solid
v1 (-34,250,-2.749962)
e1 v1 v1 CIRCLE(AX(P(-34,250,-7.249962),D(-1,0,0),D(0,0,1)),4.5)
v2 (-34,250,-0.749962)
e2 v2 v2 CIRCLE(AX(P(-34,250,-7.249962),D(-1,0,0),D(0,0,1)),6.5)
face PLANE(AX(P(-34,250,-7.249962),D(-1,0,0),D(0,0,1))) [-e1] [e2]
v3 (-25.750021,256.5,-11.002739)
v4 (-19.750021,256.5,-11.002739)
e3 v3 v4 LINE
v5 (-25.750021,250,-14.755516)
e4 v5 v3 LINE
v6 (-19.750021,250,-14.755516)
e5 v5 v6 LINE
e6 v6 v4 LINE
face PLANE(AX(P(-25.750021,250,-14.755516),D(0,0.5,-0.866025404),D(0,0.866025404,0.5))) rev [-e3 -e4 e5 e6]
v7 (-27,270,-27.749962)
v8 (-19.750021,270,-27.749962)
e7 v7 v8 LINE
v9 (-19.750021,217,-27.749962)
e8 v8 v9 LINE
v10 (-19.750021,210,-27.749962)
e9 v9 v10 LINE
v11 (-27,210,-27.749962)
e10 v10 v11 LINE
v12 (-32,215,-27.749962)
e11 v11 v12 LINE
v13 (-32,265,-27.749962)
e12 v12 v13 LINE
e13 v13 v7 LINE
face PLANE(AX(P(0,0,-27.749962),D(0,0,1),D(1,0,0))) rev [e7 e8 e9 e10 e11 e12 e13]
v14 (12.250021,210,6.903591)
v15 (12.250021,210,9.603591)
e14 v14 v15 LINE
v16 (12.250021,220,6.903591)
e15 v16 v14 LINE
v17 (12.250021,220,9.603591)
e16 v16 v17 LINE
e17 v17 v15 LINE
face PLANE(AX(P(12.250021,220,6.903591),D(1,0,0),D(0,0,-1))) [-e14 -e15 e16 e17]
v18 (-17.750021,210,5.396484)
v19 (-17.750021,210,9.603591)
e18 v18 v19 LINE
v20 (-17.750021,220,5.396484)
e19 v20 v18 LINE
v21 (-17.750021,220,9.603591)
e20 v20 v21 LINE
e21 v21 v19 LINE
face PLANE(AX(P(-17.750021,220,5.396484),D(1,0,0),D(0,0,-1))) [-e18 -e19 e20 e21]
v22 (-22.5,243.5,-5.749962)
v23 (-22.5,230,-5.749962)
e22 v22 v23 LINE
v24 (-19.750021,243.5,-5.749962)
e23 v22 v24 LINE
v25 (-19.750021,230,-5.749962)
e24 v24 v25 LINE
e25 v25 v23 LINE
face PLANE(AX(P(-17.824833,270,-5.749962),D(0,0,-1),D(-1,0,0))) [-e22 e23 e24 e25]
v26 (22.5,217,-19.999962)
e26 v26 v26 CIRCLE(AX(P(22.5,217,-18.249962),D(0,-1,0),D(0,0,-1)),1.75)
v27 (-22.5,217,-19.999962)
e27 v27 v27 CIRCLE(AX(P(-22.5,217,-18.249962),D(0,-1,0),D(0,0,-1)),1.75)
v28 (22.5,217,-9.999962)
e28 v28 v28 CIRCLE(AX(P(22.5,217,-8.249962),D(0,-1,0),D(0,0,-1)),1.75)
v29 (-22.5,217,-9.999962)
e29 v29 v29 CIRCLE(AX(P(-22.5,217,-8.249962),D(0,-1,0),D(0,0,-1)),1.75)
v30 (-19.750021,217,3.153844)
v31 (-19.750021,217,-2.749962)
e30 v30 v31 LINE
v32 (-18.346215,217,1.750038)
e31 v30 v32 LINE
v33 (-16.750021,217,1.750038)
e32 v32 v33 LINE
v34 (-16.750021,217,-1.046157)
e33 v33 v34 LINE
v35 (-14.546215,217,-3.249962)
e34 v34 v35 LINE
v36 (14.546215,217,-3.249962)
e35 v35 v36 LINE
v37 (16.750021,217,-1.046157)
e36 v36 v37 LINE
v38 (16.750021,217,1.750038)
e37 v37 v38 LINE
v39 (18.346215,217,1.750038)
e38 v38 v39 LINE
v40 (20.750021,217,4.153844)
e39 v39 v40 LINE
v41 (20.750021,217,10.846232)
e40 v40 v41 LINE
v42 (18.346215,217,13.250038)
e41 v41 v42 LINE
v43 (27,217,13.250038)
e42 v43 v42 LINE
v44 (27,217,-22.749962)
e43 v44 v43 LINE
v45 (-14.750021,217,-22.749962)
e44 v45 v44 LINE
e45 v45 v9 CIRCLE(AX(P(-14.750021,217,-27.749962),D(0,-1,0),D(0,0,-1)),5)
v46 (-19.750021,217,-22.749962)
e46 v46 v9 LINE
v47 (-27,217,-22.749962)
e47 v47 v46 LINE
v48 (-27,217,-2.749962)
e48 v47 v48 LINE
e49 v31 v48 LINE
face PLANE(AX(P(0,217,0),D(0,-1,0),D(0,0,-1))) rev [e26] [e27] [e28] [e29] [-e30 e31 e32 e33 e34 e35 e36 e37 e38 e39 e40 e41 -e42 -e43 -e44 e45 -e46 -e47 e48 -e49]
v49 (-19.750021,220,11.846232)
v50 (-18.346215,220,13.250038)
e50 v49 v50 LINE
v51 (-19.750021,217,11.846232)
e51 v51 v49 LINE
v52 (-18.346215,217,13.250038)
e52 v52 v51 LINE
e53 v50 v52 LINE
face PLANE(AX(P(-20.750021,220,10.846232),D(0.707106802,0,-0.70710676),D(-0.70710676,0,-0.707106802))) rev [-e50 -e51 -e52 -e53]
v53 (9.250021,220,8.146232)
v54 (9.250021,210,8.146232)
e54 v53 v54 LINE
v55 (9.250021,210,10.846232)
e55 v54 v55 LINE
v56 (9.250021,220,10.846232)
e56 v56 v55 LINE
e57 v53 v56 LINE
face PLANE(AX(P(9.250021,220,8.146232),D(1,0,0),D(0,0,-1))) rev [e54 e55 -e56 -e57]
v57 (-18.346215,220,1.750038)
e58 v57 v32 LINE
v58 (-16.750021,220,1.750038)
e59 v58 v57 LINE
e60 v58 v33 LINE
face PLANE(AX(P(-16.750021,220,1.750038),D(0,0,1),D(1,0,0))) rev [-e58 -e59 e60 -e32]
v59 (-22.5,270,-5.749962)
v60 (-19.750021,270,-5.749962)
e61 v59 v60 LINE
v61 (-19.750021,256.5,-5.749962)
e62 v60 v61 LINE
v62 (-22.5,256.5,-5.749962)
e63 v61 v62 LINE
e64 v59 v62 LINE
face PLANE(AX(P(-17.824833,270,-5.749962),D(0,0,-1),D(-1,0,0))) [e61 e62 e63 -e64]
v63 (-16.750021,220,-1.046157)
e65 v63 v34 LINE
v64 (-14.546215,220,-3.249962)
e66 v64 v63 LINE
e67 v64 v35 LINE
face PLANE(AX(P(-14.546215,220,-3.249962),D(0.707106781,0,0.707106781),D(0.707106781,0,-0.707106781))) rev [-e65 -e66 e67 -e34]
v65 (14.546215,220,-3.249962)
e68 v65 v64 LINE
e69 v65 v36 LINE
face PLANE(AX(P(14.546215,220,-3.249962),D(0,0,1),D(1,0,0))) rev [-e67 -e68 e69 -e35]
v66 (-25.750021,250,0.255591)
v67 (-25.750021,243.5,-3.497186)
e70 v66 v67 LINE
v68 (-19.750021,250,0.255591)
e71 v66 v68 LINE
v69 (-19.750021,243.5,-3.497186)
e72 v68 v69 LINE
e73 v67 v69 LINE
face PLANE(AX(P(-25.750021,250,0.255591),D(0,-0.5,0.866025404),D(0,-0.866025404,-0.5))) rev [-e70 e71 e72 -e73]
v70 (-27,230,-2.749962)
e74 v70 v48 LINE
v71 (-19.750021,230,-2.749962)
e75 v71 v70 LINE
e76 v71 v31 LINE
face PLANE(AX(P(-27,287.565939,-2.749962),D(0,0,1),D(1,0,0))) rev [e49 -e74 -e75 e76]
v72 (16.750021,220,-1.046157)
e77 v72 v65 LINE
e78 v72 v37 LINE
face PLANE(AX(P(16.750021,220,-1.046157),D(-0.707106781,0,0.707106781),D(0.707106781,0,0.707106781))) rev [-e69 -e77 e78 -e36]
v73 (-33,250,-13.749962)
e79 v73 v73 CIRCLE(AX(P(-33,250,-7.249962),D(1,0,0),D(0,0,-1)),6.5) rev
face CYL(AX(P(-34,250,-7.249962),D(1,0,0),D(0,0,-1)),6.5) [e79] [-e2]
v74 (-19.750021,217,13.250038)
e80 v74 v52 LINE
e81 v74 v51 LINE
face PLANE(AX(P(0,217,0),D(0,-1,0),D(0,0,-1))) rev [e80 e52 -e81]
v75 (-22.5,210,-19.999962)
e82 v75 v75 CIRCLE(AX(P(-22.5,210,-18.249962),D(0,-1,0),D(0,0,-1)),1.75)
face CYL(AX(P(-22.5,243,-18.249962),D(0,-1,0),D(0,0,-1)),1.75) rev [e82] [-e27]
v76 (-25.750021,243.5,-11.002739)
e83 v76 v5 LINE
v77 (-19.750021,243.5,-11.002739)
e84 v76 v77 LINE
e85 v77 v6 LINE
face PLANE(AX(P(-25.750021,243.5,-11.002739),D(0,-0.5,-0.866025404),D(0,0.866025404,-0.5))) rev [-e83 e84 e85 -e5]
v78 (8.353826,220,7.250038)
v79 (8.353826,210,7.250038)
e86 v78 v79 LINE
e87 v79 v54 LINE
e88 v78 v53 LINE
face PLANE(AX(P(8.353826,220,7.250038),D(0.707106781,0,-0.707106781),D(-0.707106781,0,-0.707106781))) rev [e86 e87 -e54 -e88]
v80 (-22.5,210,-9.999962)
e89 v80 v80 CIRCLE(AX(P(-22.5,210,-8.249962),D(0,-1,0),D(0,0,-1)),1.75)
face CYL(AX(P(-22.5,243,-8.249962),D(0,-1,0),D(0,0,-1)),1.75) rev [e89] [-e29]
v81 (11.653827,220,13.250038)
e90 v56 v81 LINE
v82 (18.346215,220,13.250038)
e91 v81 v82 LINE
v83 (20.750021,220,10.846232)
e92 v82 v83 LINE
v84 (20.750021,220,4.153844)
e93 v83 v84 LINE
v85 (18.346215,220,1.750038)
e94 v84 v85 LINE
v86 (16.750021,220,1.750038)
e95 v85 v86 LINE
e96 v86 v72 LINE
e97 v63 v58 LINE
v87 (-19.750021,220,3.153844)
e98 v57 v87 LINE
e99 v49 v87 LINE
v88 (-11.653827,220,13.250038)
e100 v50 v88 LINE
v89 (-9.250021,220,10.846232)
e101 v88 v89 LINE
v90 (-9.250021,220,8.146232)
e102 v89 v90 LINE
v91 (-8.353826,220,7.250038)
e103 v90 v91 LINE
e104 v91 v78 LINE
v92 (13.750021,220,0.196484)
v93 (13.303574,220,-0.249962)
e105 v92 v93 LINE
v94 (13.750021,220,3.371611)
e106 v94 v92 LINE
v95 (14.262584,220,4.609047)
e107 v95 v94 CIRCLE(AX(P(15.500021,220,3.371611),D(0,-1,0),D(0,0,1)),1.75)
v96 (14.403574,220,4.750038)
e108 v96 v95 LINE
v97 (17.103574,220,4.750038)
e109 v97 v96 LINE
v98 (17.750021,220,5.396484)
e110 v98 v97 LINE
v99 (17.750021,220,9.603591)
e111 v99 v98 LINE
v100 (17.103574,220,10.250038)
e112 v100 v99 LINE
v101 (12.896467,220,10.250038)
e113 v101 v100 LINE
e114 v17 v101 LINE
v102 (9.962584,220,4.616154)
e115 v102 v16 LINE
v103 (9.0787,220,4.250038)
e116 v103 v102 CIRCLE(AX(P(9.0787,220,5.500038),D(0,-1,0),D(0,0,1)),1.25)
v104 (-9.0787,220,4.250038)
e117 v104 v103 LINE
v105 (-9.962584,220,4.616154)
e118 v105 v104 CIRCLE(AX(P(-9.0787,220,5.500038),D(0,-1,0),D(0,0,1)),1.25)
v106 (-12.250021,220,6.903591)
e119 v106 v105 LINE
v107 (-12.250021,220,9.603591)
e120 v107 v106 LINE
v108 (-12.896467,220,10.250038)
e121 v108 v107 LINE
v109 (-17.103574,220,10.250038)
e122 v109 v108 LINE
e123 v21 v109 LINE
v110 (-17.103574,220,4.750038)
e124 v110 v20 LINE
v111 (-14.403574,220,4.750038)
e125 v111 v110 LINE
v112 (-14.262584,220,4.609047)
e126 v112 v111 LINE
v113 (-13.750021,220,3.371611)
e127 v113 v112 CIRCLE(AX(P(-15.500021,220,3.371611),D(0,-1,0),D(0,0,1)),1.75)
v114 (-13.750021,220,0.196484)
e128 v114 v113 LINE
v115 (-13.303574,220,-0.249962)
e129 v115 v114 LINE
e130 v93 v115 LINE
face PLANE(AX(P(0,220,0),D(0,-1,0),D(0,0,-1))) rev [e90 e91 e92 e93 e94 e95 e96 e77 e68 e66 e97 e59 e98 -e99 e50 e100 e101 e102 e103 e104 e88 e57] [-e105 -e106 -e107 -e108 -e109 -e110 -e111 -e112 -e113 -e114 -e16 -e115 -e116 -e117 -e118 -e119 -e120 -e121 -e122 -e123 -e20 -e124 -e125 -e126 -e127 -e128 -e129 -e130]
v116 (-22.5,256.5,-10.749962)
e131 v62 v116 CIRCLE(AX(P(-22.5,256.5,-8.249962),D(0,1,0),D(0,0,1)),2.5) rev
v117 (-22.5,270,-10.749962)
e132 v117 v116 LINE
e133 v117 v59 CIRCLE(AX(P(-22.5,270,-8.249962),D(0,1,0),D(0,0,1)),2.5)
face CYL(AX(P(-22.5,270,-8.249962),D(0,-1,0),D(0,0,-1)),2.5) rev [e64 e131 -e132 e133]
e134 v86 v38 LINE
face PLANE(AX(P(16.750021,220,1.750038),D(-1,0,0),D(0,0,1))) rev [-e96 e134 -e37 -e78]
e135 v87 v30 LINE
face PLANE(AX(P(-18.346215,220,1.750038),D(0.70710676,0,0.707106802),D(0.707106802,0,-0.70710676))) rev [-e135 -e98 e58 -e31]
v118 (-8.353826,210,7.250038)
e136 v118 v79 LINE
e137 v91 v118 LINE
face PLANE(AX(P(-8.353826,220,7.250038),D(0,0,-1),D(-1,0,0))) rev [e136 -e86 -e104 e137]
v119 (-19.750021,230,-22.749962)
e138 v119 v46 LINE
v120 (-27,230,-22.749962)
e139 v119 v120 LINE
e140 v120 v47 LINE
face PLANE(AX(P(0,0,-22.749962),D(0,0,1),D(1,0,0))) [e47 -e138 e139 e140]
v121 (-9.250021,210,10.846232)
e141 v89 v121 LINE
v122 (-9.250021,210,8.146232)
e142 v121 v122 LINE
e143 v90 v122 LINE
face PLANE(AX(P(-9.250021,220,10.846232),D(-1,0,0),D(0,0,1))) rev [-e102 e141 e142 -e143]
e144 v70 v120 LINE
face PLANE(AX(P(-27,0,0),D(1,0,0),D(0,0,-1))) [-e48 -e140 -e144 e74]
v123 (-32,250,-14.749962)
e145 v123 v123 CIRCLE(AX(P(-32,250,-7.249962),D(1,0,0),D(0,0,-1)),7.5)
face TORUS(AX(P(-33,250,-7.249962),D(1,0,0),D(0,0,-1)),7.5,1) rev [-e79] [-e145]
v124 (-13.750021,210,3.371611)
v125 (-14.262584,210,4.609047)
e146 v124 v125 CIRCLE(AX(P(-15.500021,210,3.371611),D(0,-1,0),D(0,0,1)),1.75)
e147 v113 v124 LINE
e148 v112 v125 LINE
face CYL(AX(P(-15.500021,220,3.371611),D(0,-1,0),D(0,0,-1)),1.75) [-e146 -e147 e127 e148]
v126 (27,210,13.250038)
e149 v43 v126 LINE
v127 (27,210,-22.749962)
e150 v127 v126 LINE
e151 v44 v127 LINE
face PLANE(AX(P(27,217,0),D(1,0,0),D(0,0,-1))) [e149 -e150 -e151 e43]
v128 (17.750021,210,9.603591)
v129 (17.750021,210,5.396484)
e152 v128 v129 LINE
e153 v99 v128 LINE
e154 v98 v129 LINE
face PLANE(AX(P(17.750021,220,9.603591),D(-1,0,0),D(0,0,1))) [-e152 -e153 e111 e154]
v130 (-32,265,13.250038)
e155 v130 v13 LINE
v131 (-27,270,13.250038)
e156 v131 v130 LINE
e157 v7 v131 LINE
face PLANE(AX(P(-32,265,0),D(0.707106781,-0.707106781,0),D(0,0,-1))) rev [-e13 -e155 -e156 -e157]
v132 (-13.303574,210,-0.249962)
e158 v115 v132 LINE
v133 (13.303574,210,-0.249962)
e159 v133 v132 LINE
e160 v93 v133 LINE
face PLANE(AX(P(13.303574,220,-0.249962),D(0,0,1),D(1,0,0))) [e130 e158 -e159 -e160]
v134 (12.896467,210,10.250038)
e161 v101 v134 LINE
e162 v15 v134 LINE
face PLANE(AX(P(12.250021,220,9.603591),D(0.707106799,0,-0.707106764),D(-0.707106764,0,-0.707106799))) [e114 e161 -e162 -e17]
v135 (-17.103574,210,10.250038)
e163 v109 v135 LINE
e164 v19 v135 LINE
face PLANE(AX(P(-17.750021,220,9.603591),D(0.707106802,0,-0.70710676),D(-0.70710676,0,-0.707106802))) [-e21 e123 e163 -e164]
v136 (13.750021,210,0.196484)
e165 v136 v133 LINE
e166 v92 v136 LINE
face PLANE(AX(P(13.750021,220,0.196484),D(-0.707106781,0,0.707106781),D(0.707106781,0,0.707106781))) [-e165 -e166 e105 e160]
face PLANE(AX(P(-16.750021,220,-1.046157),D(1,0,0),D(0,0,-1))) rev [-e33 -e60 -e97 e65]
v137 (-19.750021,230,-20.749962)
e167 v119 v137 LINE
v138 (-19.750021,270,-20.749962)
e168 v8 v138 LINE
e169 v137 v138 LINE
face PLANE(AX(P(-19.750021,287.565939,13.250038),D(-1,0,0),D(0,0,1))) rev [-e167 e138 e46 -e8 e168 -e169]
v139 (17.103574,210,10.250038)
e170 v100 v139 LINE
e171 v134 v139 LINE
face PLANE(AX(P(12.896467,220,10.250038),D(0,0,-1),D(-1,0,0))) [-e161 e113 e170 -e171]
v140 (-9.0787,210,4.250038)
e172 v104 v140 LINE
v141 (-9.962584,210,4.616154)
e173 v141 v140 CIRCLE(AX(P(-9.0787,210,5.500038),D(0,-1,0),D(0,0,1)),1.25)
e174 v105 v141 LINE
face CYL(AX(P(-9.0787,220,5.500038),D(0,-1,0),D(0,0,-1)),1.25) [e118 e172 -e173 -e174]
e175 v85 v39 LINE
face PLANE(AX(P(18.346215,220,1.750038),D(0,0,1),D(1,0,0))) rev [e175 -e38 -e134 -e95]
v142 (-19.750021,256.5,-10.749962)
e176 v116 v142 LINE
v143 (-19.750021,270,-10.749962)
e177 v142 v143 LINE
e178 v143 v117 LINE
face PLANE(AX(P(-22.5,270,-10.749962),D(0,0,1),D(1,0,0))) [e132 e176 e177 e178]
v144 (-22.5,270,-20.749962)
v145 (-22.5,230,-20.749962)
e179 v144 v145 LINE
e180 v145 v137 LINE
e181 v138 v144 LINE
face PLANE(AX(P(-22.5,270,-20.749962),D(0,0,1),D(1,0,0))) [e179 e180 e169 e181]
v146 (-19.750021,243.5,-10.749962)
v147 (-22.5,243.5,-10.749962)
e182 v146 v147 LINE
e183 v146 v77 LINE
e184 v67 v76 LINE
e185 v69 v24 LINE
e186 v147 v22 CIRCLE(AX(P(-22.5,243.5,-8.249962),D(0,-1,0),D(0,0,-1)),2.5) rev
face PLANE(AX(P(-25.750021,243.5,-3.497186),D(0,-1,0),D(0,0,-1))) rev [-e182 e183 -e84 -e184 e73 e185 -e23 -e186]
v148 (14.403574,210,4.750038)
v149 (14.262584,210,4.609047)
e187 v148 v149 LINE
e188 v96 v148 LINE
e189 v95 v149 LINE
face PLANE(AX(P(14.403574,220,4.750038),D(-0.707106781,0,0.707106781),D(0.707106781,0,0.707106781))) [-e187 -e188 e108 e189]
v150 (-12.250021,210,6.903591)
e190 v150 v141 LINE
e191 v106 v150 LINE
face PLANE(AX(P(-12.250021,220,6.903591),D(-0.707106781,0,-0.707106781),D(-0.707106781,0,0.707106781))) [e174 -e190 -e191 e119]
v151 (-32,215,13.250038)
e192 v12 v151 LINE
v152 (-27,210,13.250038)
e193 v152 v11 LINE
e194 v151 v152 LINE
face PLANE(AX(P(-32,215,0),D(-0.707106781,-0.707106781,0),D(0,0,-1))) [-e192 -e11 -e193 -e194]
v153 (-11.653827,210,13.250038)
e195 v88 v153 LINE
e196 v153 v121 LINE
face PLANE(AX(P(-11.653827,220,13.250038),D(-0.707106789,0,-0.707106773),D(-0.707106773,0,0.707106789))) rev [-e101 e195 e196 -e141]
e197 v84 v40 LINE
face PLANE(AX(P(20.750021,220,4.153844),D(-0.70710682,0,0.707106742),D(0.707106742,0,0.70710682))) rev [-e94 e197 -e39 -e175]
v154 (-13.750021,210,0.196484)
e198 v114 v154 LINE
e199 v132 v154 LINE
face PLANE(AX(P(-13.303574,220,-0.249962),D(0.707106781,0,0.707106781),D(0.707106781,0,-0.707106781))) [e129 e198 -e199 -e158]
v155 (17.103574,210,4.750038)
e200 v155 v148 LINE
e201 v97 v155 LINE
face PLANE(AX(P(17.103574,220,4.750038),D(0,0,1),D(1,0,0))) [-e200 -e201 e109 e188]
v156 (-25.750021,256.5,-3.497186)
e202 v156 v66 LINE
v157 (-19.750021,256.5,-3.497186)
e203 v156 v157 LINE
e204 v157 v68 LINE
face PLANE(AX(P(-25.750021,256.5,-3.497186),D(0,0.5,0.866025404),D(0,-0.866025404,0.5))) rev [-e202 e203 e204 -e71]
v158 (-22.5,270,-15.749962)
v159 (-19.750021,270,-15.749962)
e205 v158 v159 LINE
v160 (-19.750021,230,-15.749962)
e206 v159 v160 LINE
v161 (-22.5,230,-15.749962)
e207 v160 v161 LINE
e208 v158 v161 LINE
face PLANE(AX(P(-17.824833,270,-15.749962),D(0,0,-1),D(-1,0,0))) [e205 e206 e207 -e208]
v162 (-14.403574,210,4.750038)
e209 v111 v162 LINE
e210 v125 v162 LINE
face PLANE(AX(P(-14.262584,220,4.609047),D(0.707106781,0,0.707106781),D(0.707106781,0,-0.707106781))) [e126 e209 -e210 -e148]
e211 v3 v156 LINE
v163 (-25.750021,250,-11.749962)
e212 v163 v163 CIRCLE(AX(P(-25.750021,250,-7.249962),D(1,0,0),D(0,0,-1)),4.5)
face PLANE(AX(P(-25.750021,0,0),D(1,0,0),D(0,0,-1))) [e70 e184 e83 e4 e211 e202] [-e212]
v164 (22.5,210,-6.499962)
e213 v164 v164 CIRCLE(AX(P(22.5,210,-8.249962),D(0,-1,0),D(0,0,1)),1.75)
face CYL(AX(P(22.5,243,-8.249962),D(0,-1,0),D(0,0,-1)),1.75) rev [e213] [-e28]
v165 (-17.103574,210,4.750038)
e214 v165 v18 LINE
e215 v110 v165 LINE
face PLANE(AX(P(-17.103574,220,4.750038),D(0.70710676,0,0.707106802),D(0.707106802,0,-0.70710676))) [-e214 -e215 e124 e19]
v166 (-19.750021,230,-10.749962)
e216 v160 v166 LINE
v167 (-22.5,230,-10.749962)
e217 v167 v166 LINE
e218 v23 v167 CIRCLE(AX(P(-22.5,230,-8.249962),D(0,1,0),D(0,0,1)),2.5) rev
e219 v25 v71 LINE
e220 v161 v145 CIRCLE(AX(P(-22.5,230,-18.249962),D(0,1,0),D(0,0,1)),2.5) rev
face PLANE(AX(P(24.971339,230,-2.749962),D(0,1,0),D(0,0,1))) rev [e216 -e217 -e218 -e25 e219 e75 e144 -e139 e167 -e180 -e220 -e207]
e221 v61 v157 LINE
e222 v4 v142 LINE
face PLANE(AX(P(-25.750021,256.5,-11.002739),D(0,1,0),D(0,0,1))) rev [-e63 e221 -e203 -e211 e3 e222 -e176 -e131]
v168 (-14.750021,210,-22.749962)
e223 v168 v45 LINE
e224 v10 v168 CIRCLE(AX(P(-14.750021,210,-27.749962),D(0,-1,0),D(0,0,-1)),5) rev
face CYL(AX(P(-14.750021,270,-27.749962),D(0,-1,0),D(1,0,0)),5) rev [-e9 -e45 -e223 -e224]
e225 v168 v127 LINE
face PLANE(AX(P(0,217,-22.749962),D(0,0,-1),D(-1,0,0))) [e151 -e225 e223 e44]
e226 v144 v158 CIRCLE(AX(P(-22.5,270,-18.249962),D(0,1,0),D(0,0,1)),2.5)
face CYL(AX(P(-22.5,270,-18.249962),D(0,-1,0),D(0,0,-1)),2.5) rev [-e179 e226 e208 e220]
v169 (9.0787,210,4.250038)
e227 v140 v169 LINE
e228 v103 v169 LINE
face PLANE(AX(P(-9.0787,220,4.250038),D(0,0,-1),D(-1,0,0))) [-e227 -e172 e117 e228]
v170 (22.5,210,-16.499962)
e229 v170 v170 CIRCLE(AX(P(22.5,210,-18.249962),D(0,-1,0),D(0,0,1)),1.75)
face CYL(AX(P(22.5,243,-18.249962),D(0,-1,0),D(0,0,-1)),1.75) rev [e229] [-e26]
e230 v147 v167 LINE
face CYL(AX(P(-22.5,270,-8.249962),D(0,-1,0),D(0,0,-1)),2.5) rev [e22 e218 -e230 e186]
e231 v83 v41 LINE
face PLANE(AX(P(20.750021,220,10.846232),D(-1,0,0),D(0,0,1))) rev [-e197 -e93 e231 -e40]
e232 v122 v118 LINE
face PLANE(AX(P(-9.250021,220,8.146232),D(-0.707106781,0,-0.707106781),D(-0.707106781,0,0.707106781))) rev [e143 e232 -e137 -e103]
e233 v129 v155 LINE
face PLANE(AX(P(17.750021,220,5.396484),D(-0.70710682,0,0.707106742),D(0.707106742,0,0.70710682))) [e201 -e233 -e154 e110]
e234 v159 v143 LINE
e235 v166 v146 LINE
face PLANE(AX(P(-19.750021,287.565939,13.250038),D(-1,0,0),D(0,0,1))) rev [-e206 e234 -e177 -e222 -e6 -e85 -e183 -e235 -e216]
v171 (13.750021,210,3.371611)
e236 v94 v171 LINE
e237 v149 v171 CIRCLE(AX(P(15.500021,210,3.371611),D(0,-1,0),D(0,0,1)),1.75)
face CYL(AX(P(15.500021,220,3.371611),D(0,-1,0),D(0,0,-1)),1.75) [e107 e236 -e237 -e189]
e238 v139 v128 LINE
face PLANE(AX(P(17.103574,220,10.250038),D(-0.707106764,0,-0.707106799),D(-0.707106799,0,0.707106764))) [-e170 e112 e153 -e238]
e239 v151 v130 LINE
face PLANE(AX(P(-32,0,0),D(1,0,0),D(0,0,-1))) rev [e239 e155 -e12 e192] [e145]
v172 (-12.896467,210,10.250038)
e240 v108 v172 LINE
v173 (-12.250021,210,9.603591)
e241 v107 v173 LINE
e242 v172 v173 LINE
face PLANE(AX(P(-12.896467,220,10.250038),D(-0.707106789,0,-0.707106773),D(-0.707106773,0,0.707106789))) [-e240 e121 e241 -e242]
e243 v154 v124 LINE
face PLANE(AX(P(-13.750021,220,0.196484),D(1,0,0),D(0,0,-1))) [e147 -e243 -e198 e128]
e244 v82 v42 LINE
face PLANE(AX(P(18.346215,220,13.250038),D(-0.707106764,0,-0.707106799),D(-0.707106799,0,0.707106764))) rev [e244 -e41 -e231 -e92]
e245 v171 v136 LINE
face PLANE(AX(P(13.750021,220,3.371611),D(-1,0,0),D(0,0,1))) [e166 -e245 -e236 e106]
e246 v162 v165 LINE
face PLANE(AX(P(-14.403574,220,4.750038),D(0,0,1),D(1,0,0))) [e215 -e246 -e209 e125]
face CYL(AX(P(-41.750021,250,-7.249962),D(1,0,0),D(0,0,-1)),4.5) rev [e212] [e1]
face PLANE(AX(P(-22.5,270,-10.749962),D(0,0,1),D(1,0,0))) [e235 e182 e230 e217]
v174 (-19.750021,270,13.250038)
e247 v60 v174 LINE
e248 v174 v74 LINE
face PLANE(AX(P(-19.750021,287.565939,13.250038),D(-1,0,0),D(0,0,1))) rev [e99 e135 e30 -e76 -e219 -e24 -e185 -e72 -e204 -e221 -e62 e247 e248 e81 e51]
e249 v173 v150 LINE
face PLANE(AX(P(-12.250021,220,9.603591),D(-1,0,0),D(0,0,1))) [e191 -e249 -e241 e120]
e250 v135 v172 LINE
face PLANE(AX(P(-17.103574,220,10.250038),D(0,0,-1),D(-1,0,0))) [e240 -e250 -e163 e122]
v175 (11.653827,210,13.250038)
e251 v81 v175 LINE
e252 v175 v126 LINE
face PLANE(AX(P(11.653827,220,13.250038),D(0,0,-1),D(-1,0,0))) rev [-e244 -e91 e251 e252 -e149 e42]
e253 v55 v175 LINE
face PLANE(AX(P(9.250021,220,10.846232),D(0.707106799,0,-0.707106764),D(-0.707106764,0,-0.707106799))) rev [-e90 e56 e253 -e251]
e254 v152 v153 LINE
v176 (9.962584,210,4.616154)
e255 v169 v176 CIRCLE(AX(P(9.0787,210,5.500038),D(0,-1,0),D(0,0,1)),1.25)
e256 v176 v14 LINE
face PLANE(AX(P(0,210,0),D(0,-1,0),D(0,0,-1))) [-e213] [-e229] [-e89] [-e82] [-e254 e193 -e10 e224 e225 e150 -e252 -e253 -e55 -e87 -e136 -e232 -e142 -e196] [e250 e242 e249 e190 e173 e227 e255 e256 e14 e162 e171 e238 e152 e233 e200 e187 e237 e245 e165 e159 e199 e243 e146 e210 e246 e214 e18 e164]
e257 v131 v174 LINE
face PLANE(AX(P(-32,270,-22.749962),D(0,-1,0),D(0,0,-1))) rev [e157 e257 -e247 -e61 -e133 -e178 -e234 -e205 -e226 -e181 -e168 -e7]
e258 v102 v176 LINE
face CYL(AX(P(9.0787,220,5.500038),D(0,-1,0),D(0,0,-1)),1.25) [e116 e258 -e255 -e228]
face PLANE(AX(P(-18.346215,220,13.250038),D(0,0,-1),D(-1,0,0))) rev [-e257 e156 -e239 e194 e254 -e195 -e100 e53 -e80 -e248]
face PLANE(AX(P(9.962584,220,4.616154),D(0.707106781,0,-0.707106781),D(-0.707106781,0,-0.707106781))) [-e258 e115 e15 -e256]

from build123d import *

# Parameters (mm, degrees)
BOSS_EXTRUDE1_DEPTH = 400
BOSS_EXTRUDE2_DEPTH = 10
SKETCH3_R           = 43.000999871
CUT_EXTRUDE1_DEPTH  = 447.360216168
BOSS_EXTRUDE3_DEPTH = 7
SKETCH5_R           = 1.75
CUT_EXTRUDE2_DEPTH  = 33
SKETCH6_W           = 36.000000185
SKETCH6_H           = 60
BOSS_EXTRUDE4_DEPTH = 5
SKETCH7_W           = 7.24997928
SKETCH7_H           = 16
BOSS_EXTRUDE5_DEPTH = 53
SKETCH8_W           = 12.24997928
SKETCH8_H           = 60
BOSS_EXTRUDE6_DEPTH = 5
FILLET1_R           = 5
SKETCH10_W          = 20.000000185
SKETCH10_H          = 40
BOSS_EXTRUDE7_DEPTH = 7.24997928
CUT_EXTRUDE3_DEPTH  = 6
CUT_EXTRUDE4_DEPTH  = 68.845857758
SKETCH12_R          = 4.5
CUT_EXTRUDE5_DEPTH  = 16
CHAMFER2_SIZE       = 5
CHAMFER3_SIZE       = 5
SKETCH13_R          = 6.5
SKETCH13_R_2        = 4.5
BOSS_EXTRUDE8_DEPTH = 2
FILLET2_R           = 1


with BuildPart() as part:
    # Sketch1 → Boss-Extrude1 (new body)
    with BuildSketch(Plane(origin=(0, 200, 0), x_dir=(1, 0, 0), z_dir=(0, 1, 0))):
        with BuildLine():
            Line((1e-09, -3.855700002), (0.25, -4.00003757))
            Line((0.25, -4.00003757), (9.078700232, -4.00003757))
            ThreePointArc((9.078700232, -4.00003757), (9.652725366, -4.114218268), (10.139360377, -4.439377387))
            Line((10.139360377, -4.439377387), (12.500020747, -6.800037757))
            Line((12.500020747, -6.800037757), (12.500020747, -9.500037757))
            Line((12.500020747, -9.500037757), (13.00002072, -10.000037755))
            Line((13.00002072, -10.000037755), (17.00002072, -10.000037755))
            Line((17.00002072, -10.000037755), (17.500020747, -9.500037752))
            Line((17.500020747, -9.500037752), (17.500020747, -5.500037752))
            Line((17.500020747, -5.500037752), (17.00002075, -5.0000377))
            Line((17.00002075, -5.0000377), (14.30002072, -5.0000377))
            Line((14.30002072, -5.0000377), (14.085807141, -4.785824121))
            ThreePointArc((14.085807141, -4.785824121), (13.652261651, -4.136977442), (13.50002072, -3.371610598))
            Line((13.50002072, -3.371610598), (13.50002072, -0.30003757))
            Line((13.50002072, -0.30003757), (13.20002072, -3.757e-05))
            Line((13.20002072, -3.757e-05), (7.50002072, -3.757e-05))
            Line((7.50002072, -3.757e-05), (7.40002072, -0.10003757))
            Line((7.40002072, -0.10003757), (-7.40002072, -0.10003757))
            Line((-7.40002072, -0.10003757), (-7.50002072, -3.757e-05))
            Line((-7.50002072, -3.757e-05), (-13.20002072, -3.757e-05))
            Line((-13.20002072, -3.757e-05), (-13.50002072, -0.30003757))
            Line((-13.50002072, -0.30003757), (-13.50002072, -3.371610628))
            ThreePointArc((-13.50002072, -3.371610628), (-13.652261651, -4.136977472), (-14.085807141, -4.785824151))
            Line((-14.085807141, -4.785824151), (-14.30002069, -5.0000377))
            Line((-14.30002069, -5.0000377), (-17.00002072, -5.0000377))
            Line((-17.00002072, -5.0000377), (-17.50002072, -5.50003767))
            Line((-17.50002072, -5.50003767), (-17.50002072, -9.50003767))
            Line((-17.50002072, -9.50003767), (-17.000020665, -10.000037755))
            Line((-17.000020665, -10.000037755), (-13.00002072, -10.000037755))
            Line((-13.00002072, -10.000037755), (-12.500020741, -9.500037764))
            Line((-12.500020741, -9.500037764), (-12.500020741, -6.800037764))
            Line((-12.500020741, -6.800037764), (-10.139360364, -4.439377387))
            ThreePointArc((-10.139360364, -4.439377387), (-9.652725352, -4.114218268), (-9.078700218, -4.00003757))
            Line((-9.078700218, -4.00003757), (-0.25, -4.00003757))
            Line((-0.25, -4.00003757), (1e-09, -3.855700002))
        make_face()
    extrude(amount=-BOSS_EXTRUDE1_DEPTH)

    # Sketch3 → Cut-Extrude1 (cut)
    with BuildSketch(Plane(origin=(0, 200, 0), x_dir=(1, 0, 0), z_dir=(0, 1, 0))):
        with Locations((0, -0.10003757)):
            Circle(SKETCH3_R)
    extrude(amount=-CUT_EXTRUDE1_DEPTH, mode=Mode.SUBTRACT)


with BuildPart() as body_2:
    # Sketch2 → Boss-Extrude2 (new body)
    with BuildSketch(Plane(origin=(0, 210, 0), x_dir=(1, 0, 0), z_dir=(0, 1, 0))):
        Polygon((-8.353826469, -7.25003757), (8.353826482, -7.25003757), (9.250020747, -8.146231835), (9.250020747, -10.846231788), (11.653826595, -13.250037755), (18.34621475, -13.250037755), (20.750020747, -10.846231878), (20.750020747, -4.153843779), (18.346214932, -1.7500377), (16.75002072, -1.7500377), (16.75002072, 1.046156508), (14.546214798, 3.24996243), (-14.546214798, 3.24996243), (-16.75002072, 1.046156508), (-16.75002072, -1.7500377), (-18.346214741, -1.7500377), (-20.75002072, -4.153843535), (-20.75002072, -10.846231691), (-18.3462148, -13.250037755), (-11.653826621, -13.250037755), (-9.250020741, -10.846231821), (-9.250020741, -8.146231842), align=None)
        with BuildLine():
            Line((13.303574111, 0.24996243), (-13.303574111, 0.24996243))
            Line((-13.303574111, 0.24996243), (-13.75002072, -0.196484179))
            Line((-13.75002072, -0.196484179), (-13.75002072, -3.371610628))
            ThreePointArc((-13.75002072, -3.371610628), (-13.883231534, -4.041306614), (-14.262583837, -4.609047456))
            Line((-14.262583837, -4.609047456), (-14.403574081, -4.7500377))
            Line((-14.403574081, -4.7500377), (-17.103574106, -4.7500377))
            Line((-17.103574106, -4.7500377), (-17.75002072, -5.396484275))
            Line((-17.75002072, -5.396484275), (-17.75002072, -9.603591056))
            Line((-17.75002072, -9.603591056), (-17.10357406, -10.250037755))
            Line((-17.10357406, -10.250037755), (-12.896467328, -10.250037755))
            Line((-12.896467328, -10.250037755), (-12.250020741, -9.603591153))
            Line((-12.250020741, -9.603591153), (-12.250020741, -6.903591155))
            Line((-12.250020741, -6.903591155), (-9.962583668, -4.616154083))
            ThreePointArc((-9.962583668, -4.616154083), (-9.557054494, -4.345188152), (-9.078700218, -4.25003757))
            Line((-9.078700218, -4.25003757), (9.078700232, -4.25003757))
            ThreePointArc((9.078700232, -4.25003757), (9.557054508, -4.345188152), (9.962583682, -4.616154083))
            Line((9.962583682, -4.616154083), (12.250020747, -6.903591148))
            Line((12.250020747, -6.903591148), (12.250020747, -9.603591144))
            Line((12.250020747, -9.603591144), (12.896467326, -10.250037755))
            Line((12.896467326, -10.250037755), (17.103574107, -10.250037755))
            Line((17.103574107, -10.250037755), (17.750020747, -9.603591147))
            Line((17.750020747, -9.603591147), (17.750020747, -5.39648437))
            Line((17.750020747, -5.39648437), (17.103574149, -4.7500377))
            Line((17.103574149, -4.7500377), (14.403574111, -4.7500377))
            Line((14.403574111, -4.7500377), (14.262583837, -4.609047426))
            ThreePointArc((14.262583837, -4.609047426), (13.883231534, -4.041306584), (13.75002072, -3.371610598))
            Line((13.75002072, -3.371610598), (13.75002072, -0.196484179))
            Line((13.75002072, -0.196484179), (13.303574111, 0.24996243))
        make_face(mode=Mode.SUBTRACT)
    extrude(amount=BOSS_EXTRUDE2_DEPTH)

    # Sketch4 → Boss-Extrude3 (add)
    with BuildSketch(Plane(origin=(0, 210, 0), x_dir=(-1, 0, 0), z_dir=(0, -1, 0))):
        Polygon((27, -13.250037755), (27, 22.74996243), (-27, 22.74996243), (-27, -13.250037755), (-18.34621475, -13.250037755), (-20.750020747, -10.846231878), (-20.750020747, -4.153843779), (-18.346214932, -1.7500377), (-16.75002072, -1.7500377), (-16.75002072, 1.046156508), (-14.546214798, 3.24996243), (14.546214798, 3.24996243), (16.75002072, 1.046156508), (16.75002072, -1.7500377), (18.346214741, -1.7500377), (20.75002072, -4.153843535), (20.75002072, -10.846231691), (18.3462148, -13.250037755), align=None)
    extrude(amount=-BOSS_EXTRUDE3_DEPTH)

    # Sketch5 → Cut-Extrude2 (cut)
    with BuildSketch(Plane(origin=(0, 210, 0), x_dir=(-1, 0, 0), z_dir=(0, -1, 0))):
        with Locations(Location((22.5, 18.24996243, 0), (0, 0, 90))):
            Circle(SKETCH5_R)
        with Locations(Location((22.5, 8.24996243, 0), (0, 0, 90))):
            Circle(SKETCH5_R)
        with Locations(Location((-22.5, 8.24996243, 0), (0, 0, 90))):
            Circle(SKETCH5_R)
        with Locations(Location((-22.5, 18.24996243, 0), (0, 0, 90))):
            Circle(SKETCH5_R)
    extrude(amount=-CUT_EXTRUDE2_DEPTH, mode=Mode.SUBTRACT)

    # Sketch6 → Boss-Extrude4 (add)
    with BuildSketch(Plane.ZY.offset(27)):
        with Locations((-4.749962337, 240)):
            Rectangle(SKETCH6_W, SKETCH6_H)
    extrude(amount=BOSS_EXTRUDE4_DEPTH)

    # Sketch7 → Boss-Extrude5 (add)
    with BuildSketch(Plane(origin=(0, 217, 0), x_dir=(1, 0, 0), z_dir=(0, 1, 0))):
        with Locations((-23.37501036, -5.250037755)):
            Rectangle(SKETCH7_W, SKETCH7_H)
    extrude(amount=BOSS_EXTRUDE5_DEPTH)

    # Sketch8 → Boss-Extrude6 (add)
    with BuildSketch(Plane(origin=(0, 0, -22.74996243), x_dir=(-1, 0, 0), z_dir=(0, 0, -1))):
        with Locations((25.87501036, 240)):
            Rectangle(SKETCH8_W, SKETCH8_H)
    extrude(amount=BOSS_EXTRUDE6_DEPTH)

    # Fillet1
    fillet1_edges = [body_2.edges().sort_by_distance(p)[0] for p in [
        (-19.75002072, 213.5, -22.74996243),
    ]]
    fillet(fillet1_edges, radius=FILLET1_R - 0.0001)  # a hair under: the kernel refuses the full size

    # Sketch10 → Boss-Extrude7 (add)
    with BuildSketch(Plane(origin=(-27, 0, 0), x_dir=(0, 0, -1), z_dir=(1, 0, 0))):
        with Locations((12.749962337, 250)):
            Rectangle(SKETCH10_W, SKETCH10_H)
    extrude(amount=BOSS_EXTRUDE7_DEPTH)

    # Sketch9 → Cut-Extrude3 (cut)
    with BuildSketch(Plane(origin=(-19.75002072, 0, 0), x_dir=(0, 0, -1), z_dir=(1, 0, 0))):
        Polygon((14.755515837, 250), (11.002739087, 256.5), (3.497185588, 256.5), (-0.255591162, 250), (3.497185588, 243.5), (11.002739087, 243.5), align=None)
    extrude(amount=-CUT_EXTRUDE3_DEPTH, mode=Mode.SUBTRACT)

    # Sketch11 → Cut-Extrude4 (cut, through all)
    with BuildSketch(Plane(origin=(0, 217, 0), x_dir=(1, 0, 0), z_dir=(0, 1, 0))):
        with BuildLine():
            Line((-22.5, 20.74996243), (-17.824832595, 20.74996243))
            Line((-17.824832595, 20.74996243), (-17.824832595, 15.74996243))
            Line((-17.824832595, 15.74996243), (-22.5, 15.74996243))
            ThreePointArc((-22.5, 15.74996243), (-25, 18.24996243), (-22.5, 20.74996243))
        make_face()
        with BuildLine():
            Line((-22.5, 10.74996243), (-17.824832595, 10.74996243))
            Line((-17.824832595, 10.74996243), (-17.824832595, 5.74996243))
            Line((-17.824832595, 5.74996243), (-22.5, 5.74996243))
            ThreePointArc((-22.5, 5.74996243), (-25, 8.24996243), (-22.5, 10.74996243))
        make_face()
    extrude(amount=CUT_EXTRUDE4_DEPTH, mode=Mode.SUBTRACT)

    # Sketch12 → Cut-Extrude5 (cut)
    with BuildSketch(Plane(origin=(-25.75002072, 0, 0), x_dir=(0, 0, -1), z_dir=(1, 0, 0))):
        with Locations((7.249962338, 250)):
            Circle(SKETCH12_R)
    extrude(amount=-CUT_EXTRUDE5_DEPTH, mode=Mode.SUBTRACT)

    # Chamfer2
    chamfer2_edges = [body_2.edges().sort_by_distance(p)[0] for p in [
        (-32, 270, -7.249962337),
    ]]
    chamfer(chamfer2_edges, length=CHAMFER2_SIZE)

    # Chamfer3
    chamfer3_edges = [body_2.edges().sort_by_distance(p)[0] for p in [
        (-32, 210, -7.249962338),
    ]]
    chamfer(chamfer3_edges, length=CHAMFER3_SIZE)

    # Sketch13 → Boss-Extrude8 (add)
    with BuildSketch(Plane.ZY.offset(32)):
        with Locations(Location((-7.249962338, 250, 0), (0, 0, 180))):
            Circle(SKETCH13_R)
        with Locations(Location((-7.249962338, 250, 0), (0, 0, 180))):
            Circle(SKETCH13_R_2, mode=Mode.SUBTRACT)
    extrude(amount=BOSS_EXTRUDE8_DEPTH)

    # Fillet2
    fillet2_edges = [body_2.edges().sort_by_distance(p)[0] for p in [
        (-32, 250, -0.749962338),
    ]]
    fillet(fillet2_edges, radius=FILLET2_R)


solid = body_2.part
